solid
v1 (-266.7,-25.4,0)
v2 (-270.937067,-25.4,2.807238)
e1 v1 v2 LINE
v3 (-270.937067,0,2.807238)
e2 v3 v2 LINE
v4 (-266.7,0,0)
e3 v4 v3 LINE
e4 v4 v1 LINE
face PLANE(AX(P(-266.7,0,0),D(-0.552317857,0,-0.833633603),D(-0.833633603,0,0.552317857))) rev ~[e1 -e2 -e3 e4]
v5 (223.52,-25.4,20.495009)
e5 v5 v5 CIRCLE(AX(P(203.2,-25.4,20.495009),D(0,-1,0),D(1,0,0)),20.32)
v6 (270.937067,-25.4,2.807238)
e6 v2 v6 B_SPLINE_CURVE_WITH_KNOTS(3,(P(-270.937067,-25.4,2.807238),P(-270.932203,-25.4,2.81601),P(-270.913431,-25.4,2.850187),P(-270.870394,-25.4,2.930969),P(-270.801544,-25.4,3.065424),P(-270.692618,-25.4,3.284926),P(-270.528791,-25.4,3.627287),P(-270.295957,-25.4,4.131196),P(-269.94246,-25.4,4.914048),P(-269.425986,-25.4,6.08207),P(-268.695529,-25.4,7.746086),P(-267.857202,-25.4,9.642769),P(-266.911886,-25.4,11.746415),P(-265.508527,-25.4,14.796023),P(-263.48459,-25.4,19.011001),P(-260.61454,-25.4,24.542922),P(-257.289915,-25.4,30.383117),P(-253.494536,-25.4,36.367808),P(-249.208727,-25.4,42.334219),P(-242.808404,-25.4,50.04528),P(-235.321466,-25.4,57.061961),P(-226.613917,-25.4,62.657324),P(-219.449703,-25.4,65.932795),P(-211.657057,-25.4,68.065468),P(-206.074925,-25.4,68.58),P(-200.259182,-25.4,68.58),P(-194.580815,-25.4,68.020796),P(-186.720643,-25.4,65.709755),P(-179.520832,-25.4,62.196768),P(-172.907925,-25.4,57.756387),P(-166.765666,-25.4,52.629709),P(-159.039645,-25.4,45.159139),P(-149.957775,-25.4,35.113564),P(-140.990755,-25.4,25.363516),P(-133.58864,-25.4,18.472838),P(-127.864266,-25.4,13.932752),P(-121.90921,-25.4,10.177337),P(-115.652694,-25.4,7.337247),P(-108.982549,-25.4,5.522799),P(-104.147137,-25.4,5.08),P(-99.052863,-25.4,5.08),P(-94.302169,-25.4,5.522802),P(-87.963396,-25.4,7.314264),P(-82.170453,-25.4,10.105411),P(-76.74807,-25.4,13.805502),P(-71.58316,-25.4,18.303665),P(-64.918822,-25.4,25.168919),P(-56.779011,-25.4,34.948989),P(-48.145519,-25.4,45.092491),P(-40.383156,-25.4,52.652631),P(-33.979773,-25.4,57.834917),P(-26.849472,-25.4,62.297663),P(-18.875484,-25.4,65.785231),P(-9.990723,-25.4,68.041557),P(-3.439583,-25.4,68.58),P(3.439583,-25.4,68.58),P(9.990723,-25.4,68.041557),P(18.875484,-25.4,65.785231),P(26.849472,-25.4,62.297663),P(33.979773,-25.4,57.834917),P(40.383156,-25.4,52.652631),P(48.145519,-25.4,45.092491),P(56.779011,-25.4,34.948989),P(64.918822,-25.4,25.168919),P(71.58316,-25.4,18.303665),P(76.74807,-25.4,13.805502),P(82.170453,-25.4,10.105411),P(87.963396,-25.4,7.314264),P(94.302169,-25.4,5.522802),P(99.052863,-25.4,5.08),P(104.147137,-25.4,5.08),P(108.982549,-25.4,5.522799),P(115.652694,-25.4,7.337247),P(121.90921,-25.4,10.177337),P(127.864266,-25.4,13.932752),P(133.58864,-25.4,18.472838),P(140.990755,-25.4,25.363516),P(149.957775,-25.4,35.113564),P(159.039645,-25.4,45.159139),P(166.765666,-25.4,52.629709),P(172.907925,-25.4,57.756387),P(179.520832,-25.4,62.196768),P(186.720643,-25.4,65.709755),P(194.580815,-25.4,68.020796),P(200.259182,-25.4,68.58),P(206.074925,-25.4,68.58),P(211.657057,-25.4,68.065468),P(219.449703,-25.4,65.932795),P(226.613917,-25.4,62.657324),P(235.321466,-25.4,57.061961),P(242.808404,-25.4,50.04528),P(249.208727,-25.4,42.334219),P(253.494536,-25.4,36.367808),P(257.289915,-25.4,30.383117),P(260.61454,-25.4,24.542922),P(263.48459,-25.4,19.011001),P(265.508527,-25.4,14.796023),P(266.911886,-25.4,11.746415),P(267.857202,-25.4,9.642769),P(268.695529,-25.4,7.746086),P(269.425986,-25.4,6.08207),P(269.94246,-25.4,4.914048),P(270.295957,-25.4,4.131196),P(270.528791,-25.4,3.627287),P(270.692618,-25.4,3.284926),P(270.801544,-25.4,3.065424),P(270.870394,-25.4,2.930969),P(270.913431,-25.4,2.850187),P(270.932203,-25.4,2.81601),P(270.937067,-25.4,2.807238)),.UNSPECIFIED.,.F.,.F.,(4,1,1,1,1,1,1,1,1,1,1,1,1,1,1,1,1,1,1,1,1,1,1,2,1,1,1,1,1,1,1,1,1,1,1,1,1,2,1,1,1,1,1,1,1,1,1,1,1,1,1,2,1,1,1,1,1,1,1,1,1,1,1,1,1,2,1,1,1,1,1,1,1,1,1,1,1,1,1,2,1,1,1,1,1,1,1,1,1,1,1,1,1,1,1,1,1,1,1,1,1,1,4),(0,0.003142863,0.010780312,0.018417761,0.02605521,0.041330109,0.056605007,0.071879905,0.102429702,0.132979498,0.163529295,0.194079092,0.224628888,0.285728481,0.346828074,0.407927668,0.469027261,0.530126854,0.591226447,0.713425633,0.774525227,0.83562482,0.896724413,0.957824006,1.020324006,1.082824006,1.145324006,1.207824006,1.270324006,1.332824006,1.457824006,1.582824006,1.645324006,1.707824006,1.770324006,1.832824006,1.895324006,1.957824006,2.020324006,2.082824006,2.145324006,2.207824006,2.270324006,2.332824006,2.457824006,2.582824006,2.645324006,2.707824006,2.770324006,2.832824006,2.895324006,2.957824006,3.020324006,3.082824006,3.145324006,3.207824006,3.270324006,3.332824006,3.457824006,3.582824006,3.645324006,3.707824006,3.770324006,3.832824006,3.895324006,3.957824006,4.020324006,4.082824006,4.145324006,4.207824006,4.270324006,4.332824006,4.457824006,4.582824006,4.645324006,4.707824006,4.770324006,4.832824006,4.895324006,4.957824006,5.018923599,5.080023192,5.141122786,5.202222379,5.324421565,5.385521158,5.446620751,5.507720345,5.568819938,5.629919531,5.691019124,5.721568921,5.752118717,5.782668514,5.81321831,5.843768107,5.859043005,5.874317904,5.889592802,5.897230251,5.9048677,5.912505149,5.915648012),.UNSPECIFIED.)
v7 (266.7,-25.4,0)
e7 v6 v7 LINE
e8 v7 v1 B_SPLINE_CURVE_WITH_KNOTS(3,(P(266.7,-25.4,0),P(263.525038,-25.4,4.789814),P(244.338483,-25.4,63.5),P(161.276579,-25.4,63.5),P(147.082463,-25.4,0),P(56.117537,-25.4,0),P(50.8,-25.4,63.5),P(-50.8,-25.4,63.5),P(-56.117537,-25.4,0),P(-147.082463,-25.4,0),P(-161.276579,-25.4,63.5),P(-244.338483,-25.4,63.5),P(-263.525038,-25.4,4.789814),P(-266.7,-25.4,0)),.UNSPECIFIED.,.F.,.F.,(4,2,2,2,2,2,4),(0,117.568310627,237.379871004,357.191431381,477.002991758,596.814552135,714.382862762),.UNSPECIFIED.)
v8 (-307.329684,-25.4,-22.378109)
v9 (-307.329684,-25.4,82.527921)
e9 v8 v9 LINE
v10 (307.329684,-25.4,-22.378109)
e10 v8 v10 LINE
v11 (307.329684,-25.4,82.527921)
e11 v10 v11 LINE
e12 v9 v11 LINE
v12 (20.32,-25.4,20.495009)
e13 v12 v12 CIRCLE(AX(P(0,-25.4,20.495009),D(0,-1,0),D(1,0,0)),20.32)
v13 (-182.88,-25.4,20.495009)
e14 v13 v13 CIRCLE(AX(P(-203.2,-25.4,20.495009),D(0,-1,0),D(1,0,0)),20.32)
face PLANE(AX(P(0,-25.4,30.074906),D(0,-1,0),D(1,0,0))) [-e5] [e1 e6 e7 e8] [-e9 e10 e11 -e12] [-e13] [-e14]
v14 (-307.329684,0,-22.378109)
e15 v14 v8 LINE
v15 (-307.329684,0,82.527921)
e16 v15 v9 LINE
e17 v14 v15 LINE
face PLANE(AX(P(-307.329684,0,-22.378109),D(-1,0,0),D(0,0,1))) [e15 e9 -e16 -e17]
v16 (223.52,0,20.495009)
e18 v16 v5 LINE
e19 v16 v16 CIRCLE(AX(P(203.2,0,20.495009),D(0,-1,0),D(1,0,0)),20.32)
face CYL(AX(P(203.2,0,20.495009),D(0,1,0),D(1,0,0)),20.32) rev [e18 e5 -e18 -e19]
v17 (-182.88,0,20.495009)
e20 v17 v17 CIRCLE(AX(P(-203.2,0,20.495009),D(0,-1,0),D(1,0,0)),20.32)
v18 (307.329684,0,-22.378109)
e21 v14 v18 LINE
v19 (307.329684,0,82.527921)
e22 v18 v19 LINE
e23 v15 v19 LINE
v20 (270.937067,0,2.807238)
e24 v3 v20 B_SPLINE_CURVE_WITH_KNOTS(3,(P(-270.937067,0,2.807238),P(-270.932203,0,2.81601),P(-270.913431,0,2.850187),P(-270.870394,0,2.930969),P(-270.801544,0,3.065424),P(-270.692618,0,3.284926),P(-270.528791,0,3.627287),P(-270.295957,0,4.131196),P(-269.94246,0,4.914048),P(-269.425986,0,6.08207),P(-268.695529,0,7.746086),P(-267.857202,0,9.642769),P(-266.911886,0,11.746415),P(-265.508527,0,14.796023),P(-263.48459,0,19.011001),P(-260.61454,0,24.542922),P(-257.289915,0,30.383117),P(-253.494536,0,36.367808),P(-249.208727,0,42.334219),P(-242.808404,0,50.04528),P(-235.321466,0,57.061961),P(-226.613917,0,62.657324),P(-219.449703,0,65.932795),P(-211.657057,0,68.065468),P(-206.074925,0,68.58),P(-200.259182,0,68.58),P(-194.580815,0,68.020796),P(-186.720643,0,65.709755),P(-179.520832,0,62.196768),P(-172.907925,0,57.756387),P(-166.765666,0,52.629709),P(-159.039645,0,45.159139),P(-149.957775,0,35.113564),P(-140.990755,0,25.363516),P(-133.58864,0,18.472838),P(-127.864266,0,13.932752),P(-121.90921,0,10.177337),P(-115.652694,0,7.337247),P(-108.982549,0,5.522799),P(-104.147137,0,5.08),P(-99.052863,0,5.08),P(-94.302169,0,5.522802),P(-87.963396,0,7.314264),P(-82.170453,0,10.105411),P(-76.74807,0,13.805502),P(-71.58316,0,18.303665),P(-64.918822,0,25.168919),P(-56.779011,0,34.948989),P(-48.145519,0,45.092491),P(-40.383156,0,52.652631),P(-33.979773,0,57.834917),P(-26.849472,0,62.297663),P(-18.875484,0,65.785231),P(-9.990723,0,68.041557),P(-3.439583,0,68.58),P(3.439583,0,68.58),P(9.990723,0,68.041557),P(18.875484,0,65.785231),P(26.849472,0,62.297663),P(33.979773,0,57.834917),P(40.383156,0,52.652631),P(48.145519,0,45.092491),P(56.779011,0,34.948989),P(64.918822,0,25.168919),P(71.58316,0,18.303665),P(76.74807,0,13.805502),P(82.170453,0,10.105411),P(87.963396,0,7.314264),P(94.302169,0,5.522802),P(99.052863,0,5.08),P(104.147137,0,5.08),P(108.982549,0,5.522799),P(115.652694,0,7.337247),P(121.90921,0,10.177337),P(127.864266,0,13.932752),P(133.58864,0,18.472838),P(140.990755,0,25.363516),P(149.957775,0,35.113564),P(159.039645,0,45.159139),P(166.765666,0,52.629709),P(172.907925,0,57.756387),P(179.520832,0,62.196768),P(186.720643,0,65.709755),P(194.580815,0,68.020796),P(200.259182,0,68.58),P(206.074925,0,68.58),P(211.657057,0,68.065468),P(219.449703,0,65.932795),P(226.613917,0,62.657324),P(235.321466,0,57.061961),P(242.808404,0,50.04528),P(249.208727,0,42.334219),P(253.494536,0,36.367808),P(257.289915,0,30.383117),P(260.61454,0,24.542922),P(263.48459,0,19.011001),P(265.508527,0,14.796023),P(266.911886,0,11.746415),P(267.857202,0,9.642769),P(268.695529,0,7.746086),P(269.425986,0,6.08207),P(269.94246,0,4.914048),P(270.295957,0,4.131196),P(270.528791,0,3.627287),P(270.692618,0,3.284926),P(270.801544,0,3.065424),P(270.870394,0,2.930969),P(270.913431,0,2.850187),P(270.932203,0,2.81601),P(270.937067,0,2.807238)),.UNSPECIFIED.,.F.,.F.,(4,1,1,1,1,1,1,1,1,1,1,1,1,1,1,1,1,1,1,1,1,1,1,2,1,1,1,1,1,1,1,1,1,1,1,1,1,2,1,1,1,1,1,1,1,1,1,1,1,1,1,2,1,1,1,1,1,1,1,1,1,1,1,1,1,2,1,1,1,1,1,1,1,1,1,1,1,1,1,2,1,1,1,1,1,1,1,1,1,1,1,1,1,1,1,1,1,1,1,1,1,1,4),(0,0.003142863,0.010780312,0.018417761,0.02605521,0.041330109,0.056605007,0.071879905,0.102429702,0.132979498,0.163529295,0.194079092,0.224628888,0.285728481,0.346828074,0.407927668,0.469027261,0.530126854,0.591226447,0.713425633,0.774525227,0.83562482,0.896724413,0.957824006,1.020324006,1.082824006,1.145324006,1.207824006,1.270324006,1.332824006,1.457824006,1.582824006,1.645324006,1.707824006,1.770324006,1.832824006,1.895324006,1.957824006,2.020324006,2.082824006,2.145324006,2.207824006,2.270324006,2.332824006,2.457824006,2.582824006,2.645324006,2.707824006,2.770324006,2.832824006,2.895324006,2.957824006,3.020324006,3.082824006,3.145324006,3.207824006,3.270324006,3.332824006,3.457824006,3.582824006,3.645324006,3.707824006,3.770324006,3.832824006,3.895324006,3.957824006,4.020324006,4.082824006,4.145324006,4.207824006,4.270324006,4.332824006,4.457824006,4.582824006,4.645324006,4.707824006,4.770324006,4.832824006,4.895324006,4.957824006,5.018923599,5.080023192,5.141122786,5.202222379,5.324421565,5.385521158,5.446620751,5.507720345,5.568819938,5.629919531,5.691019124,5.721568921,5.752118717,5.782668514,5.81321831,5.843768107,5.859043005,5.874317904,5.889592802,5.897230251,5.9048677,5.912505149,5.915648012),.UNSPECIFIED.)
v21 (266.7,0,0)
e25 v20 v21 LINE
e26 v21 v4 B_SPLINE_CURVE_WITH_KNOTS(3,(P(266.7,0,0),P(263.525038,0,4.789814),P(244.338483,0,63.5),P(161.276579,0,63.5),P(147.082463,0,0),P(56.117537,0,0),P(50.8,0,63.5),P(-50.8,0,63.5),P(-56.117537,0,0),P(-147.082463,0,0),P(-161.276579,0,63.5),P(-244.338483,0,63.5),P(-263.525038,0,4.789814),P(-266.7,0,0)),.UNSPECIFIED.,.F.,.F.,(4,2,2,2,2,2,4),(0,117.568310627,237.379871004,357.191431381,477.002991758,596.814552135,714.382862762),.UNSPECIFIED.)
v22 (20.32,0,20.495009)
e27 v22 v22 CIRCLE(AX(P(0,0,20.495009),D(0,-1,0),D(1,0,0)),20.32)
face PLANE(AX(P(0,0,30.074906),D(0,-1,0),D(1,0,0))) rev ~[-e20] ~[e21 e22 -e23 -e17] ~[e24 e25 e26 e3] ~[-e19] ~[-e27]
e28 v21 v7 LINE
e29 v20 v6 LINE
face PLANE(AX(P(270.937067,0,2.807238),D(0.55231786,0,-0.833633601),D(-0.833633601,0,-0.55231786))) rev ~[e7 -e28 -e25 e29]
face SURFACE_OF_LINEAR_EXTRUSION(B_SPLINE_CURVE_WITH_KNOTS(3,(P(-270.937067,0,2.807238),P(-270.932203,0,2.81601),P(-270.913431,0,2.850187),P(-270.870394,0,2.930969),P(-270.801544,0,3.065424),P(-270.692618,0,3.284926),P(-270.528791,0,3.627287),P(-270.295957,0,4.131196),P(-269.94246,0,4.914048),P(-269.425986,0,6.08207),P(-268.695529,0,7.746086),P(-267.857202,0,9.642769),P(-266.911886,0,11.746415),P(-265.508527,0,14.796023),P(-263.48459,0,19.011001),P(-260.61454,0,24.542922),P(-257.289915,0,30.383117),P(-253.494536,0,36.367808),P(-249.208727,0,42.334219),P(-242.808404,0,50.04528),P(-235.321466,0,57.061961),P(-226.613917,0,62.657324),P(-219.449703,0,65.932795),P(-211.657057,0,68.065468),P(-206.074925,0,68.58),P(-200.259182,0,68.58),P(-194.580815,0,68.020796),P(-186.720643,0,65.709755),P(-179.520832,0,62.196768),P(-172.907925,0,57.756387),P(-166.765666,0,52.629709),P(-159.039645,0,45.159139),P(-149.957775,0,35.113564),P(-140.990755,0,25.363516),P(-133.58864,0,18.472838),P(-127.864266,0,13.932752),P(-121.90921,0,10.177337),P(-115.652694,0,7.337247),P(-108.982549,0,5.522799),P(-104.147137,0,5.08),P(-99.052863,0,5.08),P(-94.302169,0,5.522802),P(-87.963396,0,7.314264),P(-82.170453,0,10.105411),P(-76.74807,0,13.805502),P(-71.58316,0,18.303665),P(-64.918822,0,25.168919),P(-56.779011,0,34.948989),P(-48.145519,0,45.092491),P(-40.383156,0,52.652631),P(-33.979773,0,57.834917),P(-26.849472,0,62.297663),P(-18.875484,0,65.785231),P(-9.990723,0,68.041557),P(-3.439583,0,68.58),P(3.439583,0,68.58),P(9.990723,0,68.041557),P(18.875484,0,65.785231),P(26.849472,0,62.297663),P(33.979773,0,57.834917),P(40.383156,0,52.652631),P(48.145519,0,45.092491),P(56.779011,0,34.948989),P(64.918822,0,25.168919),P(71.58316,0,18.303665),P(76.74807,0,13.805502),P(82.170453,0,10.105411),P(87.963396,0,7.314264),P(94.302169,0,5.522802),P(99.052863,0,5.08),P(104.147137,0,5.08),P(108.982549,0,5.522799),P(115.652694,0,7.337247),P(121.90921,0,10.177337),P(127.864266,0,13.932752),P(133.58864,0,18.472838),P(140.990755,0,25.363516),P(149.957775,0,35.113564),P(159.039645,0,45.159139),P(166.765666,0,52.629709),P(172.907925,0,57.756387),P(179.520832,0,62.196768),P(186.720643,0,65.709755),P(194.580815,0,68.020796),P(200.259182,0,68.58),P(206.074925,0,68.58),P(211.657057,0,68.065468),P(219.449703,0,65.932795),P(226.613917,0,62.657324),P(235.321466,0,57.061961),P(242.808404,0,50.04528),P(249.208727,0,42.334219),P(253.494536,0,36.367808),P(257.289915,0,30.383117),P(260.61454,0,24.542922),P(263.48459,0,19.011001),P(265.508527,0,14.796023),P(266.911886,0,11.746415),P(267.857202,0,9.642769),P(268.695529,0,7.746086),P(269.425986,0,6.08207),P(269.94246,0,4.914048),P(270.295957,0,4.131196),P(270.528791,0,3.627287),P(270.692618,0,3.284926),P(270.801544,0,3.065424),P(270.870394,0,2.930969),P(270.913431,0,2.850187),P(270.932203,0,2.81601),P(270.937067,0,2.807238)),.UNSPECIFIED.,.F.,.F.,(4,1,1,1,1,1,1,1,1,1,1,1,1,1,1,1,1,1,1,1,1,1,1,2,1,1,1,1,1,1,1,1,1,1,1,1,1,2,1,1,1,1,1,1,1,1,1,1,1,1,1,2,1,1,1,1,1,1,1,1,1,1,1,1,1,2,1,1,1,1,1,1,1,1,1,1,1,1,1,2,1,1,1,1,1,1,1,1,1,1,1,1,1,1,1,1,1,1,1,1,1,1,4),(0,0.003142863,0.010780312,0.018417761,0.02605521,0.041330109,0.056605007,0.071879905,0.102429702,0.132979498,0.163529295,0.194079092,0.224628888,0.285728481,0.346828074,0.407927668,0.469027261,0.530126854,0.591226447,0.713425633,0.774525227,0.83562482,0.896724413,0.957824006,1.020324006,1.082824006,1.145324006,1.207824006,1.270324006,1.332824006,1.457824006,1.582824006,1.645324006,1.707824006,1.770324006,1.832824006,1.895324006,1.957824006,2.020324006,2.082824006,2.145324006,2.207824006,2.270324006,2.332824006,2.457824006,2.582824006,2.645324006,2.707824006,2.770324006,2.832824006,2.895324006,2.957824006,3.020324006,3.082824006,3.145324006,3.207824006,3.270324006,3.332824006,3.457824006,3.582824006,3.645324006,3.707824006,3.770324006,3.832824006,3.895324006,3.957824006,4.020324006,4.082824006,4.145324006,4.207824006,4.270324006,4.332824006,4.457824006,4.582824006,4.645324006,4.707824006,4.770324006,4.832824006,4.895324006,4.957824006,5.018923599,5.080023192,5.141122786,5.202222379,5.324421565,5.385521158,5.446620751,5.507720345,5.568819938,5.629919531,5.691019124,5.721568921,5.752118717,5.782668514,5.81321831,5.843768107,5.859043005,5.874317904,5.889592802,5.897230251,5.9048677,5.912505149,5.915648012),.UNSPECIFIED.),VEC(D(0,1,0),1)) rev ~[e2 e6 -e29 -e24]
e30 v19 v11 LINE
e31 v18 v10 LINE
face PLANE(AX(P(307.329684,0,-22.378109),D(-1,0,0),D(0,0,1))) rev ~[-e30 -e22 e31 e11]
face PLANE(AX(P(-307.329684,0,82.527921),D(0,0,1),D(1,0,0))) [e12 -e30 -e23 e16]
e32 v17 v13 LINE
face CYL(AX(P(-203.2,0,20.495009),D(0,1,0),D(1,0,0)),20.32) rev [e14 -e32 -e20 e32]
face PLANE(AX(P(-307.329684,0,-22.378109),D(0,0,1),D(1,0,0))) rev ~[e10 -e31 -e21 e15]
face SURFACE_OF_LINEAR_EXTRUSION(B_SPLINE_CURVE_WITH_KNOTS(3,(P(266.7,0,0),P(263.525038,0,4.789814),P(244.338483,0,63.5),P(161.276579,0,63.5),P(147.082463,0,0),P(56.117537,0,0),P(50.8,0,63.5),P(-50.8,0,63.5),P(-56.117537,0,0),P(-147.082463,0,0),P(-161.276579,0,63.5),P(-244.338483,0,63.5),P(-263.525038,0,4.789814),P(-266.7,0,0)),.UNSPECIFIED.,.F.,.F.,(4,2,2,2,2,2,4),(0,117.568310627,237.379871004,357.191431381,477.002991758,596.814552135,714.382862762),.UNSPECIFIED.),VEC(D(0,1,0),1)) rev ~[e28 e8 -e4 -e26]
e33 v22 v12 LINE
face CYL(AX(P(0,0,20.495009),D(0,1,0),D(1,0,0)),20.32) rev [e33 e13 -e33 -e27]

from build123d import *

# Parameters (mm, degrees)
F0_W     = 614.6593689919
F0_H     = 104.9060299742
F0_R     = 20.32
F1_DEPTH = 25.4


# Not quite as in the source:
# - ends of sketch curves that miss each other by under 0.0002 mm in the source are joined
# - the dataset's text gives a spline's control points without its knots; the knots are read off the source's solid


with BuildPart() as f1:
    # F0 (on Front) → F1 (new body)
    with BuildSketch(Plane.XZ):
        with Locations((0, 30.0749056167)):
            Rectangle(F0_W, F0_H)
        with Locations((-203.2, 20.4950086772)):
            Circle(F0_R, mode=Mode.SUBTRACT)
        with Locations((0, 20.4950086772)):
            Circle(F0_R, mode=Mode.SUBTRACT)
        with Locations((203.2, 20.4950086772)):
            Circle(F0_R, mode=Mode.SUBTRACT)
        with BuildLine():
            add(Edge.make_bspline(
                [(0, 63.5), (50.8, 63.5), (56.1175370932, 0), (101.6, 0)],
                knots=[0, 0, 0, 0, 119.8115603771, 119.8115603771, 119.8115603771, 119.8115603771], degree=3))
            add(Edge.make_bspline(
                [(0, 63.5), (-50.8, 63.5), (-56.1175370932, 0), (-101.6, 0)],
                knots=[0, 0, 0, 0, 119.8115603771, 119.8115603771, 119.8115603771, 119.8115603771], degree=3))
            add(Edge.make_bspline(
                [(-101.6, 0), (-147.0824629068, 0), (-161.2765789032, 63.5), (-203.2, 63.5)],
                knots=[0, 0, 0, 0, 119.8115603771, 119.8115603771, 119.8115603771, 119.8115603771], degree=3))
            add(Edge.make_bspline(
                [(-203.2, 63.5), (-244.3384826183, 63.5), (-263.5250381589, 4.789814353), (-266.7, 0)],
                knots=[0, 0, 0, 0, 89.8025612107, 89.8025612107, 89.8025612107, 89.8025612107], degree=3))
            Line((-266.7, 0), (-270.9370674539, 2.8072381066))
            add(Edge.make_bspline(
                [(-203.2, 68.58), (-206.0749247482, 68.58), (-211.6570572562, 68.0654677515), (-219.449703116, 65.9327946823), (-226.6139167838, 62.6573237184), (-235.3214664022, 57.0619610705), (-242.8084043286, 50.0452799381), (-249.2087272272, 42.3342188514), (-253.4945356129, 36.3678079721), (-257.2899146838, 30.3831174449), (-260.614540304, 24.5429222876), (-263.4845904473, 19.0110013278), (-265.5085267197, 14.7960229142), (-266.9118861506, 11.7464153334), (-267.8572021622, 9.6427688992), (-268.6955290239, 7.7460864416), (-269.4259857327, 6.0820696315), (-269.9424600992, 4.9140477877), (-270.2959565612, 4.1311962061), (-270.5287914392, 3.627286717), (-270.6926175205, 3.2849255658), (-270.8015436387, 3.065424442), (-270.8703935577, 2.930969375), (-270.9134306119, 2.8501874319), (-270.9322031409, 2.8160102358), (-270.9370674539, 2.8072381066)],
                knots=[0, 0, 0, 0, 0.062536818, 0.125073636, 0.1876104541, 0.2501472721, 0.3752209081, 0.4377577261, 0.5002945442, 0.5628313622, 0.6253681802, 0.6879049982, 0.7504418162, 0.7817102252, 0.8129786342, 0.8442470433, 0.8755154523, 0.9067838613, 0.9224180658, 0.9380522703, 0.9536864748, 0.961503577, 0.9693206793, 0.9771377815, 0.9803545729, 0.9803545729, 0.9803545729, 0.9803545729], degree=3))
            add(Edge.make_bspline(
                [(-101.6, 5.08), (-104.1471371, 5.08), (-108.9825494519, 5.5227985642), (-115.6526939013, 7.3372474831), (-121.9092103663, 10.1773367447), (-127.8642663749, 13.932751749), (-133.5886395499, 18.4728381682), (-140.9907545945, 25.3635161712), (-149.9577750737, 35.1135642507), (-159.0396450213, 45.1591389287), (-166.7656656648, 52.6297090899), (-172.9079254728, 57.7563865096), (-179.5208319726, 62.1967681684), (-186.7206430613, 65.7097554828), (-194.5808153214, 68.0207957165), (-200.2591817799, 68.58), (-203.2, 68.58)],
                knots=[0, 0, 0, 0, 0.0625, 0.125, 0.1875, 0.25, 0.3125, 0.375, 0.5, 0.625, 0.6875, 0.75, 0.8125, 0.875, 0.9375, 1, 1, 1, 1], degree=3))
            add(Edge.make_bspline(
                [(0, 68.58), (-3.4395833333, 68.58), (-9.9907230249, 68.0415568729), (-18.8754835158, 65.7852306257), (-26.8494717203, 62.2976627153), (-33.979773011, 57.8349170952), (-40.3831564519, 52.6526314317), (-48.14551851, 45.0924908704), (-56.7790114699, 34.9489891198), (-64.9188221861, 25.1689190997), (-71.5831601125, 18.303665252), (-76.7480703911, 13.8055020439), (-82.1704530142, 10.1054105506), (-87.9633960673, 7.3142638881), (-94.302168804, 5.5228017002), (-99.0528629, 5.08), (-101.6, 5.08)],
                knots=[0, 0, 0, 0, 0.0625, 0.125, 0.1875, 0.25, 0.3125, 0.375, 0.5, 0.625, 0.6875, 0.75, 0.8125, 0.875, 0.9375, 1, 1, 1, 1], degree=3))
            add(Edge.make_bspline(
                [(0, 68.58), (3.4395833333, 68.58), (9.9907230249, 68.0415568729), (18.8754835158, 65.7852306257), (26.8494717203, 62.2976627153), (33.979773011, 57.8349170952), (40.3831564519, 52.6526314317), (48.14551851, 45.0924908704), (56.7790114699, 34.9489891198), (64.9188221861, 25.1689190997), (71.5831601125, 18.303665252), (76.7480703911, 13.8055020439), (82.1704530142, 10.1054105506), (87.9633960673, 7.3142638881), (94.302168804, 5.5228017002), (99.0528629, 5.08), (101.6, 5.08)],
                knots=[0, 0, 0, 0, 0.0625, 0.125, 0.1875, 0.25, 0.3125, 0.375, 0.5, 0.625, 0.6875, 0.75, 0.8125, 0.875, 0.9375, 1, 1, 1, 1], degree=3))
            add(Edge.make_bspline(
                [(101.6, 5.08), (104.1471371, 5.08), (108.9825494519, 5.5227985642), (115.6526939013, 7.3372474831), (121.9092103663, 10.1773367447), (127.8642663749, 13.932751749), (133.5886395499, 18.4728381682), (140.9907545945, 25.3635161712), (149.9577750737, 35.1135642507), (159.0396450213, 45.1591389287), (166.7656656648, 52.6297090899), (172.9079254728, 57.7563865096), (179.5208319726, 62.1967681684), (186.7206430613, 65.7097554828), (194.5808153214, 68.0207957165), (200.2591817799, 68.58), (203.2, 68.58)],
                knots=[0, 0, 0, 0, 0.0625, 0.125, 0.1875, 0.25, 0.3125, 0.375, 0.5, 0.625, 0.6875, 0.75, 0.8125, 0.875, 0.9375, 1, 1, 1, 1], degree=3))
            add(Edge.make_bspline(
                [(203.2, 68.58), (206.0749247482, 68.58), (211.6570572562, 68.0654677515), (219.449703116, 65.9327946823), (226.6139167838, 62.6573237184), (235.3214664022, 57.0619610705), (242.8084043286, 50.0452799381), (249.2087272272, 42.3342188514), (253.4945356129, 36.3678079721), (257.2899146838, 30.3831174449), (260.614540304, 24.5429222876), (263.4845904473, 19.0110013278), (265.5085267197, 14.7960229142), (266.9118861506, 11.7464153334), (267.8572021622, 9.6427688992), (268.6955290239, 7.7460864416), (269.4259857327, 6.0820696315), (269.9424600992, 4.9140477877), (270.2959565612, 4.1311962061), (270.5287914392, 3.627286717), (270.6926175205, 3.2849255658), (270.8015436387, 3.065424442), (270.8703935577, 2.930969375), (270.9134306119, 2.8501874319), (270.9322031409, 2.8160102358), (270.9370672724, 2.8072380059)],
                knots=[0, 0, 0, 0, 0.062536818, 0.125073636, 0.1876104541, 0.2501472721, 0.3752209081, 0.4377577261, 0.5002945442, 0.5628313622, 0.6253681802, 0.6879049982, 0.7504418162, 0.7817102252, 0.8129786342, 0.8442470433, 0.8755154523, 0.9067838613, 0.9224180658, 0.9380522703, 0.9536864748, 0.961503577, 0.9693206793, 0.9771377815, 0.9803545729, 0.9803545729, 0.9803545729, 0.9803545729], degree=3))
            Line((270.9370672724, 2.8072380059), (266.7, 0))
            add(Edge.make_bspline(
                [(203.2, 63.5), (244.3384826183, 63.5), (263.5250381589, 4.789814353), (266.7, 0)],
                knots=[0, 0, 0, 0, 89.8025612107, 89.8025612107, 89.8025612107, 89.8025612107], degree=3))
            add(Edge.make_bspline(
                [(101.6, 0), (147.0824629068, 0), (161.2765789032, 63.5), (203.2, 63.5)],
                knots=[0, 0, 0, 0, 119.8115603771, 119.8115603771, 119.8115603771, 119.8115603771], degree=3))
        make_face(mode=Mode.SUBTRACT)
    extrude(amount=F1_DEPTH)


solid = f1.part
